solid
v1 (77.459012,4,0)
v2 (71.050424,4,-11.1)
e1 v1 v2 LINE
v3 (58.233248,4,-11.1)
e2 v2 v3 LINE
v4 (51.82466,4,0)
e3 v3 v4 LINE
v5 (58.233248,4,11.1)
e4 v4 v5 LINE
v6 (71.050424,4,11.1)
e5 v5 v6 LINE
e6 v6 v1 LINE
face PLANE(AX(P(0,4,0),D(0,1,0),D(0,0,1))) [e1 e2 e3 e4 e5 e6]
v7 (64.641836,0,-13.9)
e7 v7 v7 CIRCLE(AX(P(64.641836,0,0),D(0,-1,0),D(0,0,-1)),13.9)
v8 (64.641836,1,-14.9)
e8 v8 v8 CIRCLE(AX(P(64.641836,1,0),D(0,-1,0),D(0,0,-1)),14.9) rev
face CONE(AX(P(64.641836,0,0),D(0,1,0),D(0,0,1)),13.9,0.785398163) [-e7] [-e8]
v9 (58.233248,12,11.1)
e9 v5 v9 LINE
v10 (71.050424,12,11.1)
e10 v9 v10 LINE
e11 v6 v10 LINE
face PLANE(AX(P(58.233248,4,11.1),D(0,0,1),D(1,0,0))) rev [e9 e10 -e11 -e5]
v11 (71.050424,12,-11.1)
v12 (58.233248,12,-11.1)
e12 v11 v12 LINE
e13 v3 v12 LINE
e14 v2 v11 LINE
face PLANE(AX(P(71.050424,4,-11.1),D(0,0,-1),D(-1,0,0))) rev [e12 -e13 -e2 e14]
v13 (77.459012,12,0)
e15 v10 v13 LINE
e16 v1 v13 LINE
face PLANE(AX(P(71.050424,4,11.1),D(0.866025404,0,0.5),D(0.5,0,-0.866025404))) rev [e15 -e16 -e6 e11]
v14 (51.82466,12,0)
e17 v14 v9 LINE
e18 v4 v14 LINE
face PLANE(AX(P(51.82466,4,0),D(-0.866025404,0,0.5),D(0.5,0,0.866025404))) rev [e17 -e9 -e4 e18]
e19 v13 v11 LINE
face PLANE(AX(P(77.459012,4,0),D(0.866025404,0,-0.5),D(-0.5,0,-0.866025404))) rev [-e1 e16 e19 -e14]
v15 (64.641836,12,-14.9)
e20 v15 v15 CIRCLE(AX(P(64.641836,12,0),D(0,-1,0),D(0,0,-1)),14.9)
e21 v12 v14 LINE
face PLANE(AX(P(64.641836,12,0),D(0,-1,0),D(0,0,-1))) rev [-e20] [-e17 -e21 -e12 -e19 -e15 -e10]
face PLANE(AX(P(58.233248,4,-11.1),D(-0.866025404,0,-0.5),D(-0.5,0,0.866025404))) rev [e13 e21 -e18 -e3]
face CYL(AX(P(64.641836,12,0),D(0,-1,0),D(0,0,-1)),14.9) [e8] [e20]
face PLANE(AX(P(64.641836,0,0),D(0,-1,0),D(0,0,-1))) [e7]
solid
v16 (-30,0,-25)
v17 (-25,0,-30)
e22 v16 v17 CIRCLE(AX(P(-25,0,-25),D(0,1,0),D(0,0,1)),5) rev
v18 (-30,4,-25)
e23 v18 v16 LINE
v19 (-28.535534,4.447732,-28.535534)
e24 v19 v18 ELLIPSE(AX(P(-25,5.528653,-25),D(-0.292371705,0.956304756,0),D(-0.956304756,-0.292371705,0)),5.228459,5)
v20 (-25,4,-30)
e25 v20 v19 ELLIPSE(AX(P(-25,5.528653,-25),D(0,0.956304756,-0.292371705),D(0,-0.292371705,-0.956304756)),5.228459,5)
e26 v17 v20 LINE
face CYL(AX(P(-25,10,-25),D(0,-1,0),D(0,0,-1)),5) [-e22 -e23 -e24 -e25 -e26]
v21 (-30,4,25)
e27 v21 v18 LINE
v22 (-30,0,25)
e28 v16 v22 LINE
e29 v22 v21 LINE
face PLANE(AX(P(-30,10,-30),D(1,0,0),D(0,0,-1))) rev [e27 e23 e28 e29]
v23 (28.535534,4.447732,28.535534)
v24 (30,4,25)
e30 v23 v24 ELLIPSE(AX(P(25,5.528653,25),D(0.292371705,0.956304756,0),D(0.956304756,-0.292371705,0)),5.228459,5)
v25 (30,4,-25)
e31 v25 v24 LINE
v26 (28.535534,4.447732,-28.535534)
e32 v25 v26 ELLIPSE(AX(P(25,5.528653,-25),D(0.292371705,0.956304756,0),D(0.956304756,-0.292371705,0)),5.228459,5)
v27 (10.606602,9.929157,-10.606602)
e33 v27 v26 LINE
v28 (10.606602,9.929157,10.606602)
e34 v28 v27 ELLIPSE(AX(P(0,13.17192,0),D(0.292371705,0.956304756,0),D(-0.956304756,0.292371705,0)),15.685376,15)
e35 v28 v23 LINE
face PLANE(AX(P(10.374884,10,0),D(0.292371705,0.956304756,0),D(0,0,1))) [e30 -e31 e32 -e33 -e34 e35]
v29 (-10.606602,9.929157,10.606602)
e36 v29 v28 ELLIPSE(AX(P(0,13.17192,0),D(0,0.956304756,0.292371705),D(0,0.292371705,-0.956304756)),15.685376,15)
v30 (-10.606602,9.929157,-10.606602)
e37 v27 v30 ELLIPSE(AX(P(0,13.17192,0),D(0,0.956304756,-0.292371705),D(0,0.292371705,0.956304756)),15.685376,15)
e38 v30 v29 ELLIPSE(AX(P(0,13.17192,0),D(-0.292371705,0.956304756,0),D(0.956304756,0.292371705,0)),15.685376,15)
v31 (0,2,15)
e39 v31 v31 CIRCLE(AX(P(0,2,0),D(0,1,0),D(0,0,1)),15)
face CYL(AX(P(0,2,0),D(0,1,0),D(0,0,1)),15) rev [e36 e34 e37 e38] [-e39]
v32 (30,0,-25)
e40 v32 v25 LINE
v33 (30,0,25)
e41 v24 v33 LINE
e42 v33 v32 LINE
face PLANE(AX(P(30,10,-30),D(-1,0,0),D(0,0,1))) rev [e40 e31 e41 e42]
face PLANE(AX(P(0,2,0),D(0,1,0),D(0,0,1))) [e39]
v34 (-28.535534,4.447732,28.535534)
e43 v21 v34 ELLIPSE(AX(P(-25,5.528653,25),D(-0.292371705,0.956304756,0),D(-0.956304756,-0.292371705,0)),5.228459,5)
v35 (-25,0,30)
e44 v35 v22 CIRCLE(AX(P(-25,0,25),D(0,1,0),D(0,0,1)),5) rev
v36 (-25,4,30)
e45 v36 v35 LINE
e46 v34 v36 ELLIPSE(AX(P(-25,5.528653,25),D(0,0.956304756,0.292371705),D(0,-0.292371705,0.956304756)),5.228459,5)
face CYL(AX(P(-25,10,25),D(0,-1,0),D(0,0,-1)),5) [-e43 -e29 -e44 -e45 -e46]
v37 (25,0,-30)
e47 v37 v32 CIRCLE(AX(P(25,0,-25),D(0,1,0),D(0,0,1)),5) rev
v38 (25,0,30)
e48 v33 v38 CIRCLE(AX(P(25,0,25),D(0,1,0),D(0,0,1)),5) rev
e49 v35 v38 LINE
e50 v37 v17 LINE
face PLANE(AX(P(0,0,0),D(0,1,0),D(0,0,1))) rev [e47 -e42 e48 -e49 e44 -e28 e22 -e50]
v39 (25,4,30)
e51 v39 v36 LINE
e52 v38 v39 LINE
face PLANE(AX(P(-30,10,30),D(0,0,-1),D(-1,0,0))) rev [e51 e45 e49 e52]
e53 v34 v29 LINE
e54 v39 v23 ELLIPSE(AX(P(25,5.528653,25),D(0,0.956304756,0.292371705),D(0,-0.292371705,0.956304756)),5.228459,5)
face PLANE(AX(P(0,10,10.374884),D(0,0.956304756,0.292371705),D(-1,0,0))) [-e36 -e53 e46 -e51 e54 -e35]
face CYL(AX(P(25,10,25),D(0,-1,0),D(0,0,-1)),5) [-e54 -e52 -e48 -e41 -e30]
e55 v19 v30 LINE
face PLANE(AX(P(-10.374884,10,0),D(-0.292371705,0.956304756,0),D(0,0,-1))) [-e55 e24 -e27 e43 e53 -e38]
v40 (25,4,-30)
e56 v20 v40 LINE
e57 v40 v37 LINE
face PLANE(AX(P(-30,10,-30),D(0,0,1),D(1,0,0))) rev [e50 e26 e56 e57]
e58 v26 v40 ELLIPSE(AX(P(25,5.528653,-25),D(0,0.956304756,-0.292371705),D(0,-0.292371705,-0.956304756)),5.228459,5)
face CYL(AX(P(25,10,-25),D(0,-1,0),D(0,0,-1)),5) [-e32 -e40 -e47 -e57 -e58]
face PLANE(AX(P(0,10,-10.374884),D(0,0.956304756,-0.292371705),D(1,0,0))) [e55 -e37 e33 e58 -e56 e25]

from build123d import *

# Parameters (mm, degrees)
CROQUIS1_W              = 60
CROQUIS1_H              = 60
SALIENTE_EXTRUIR1_DEPTH = 10
CROQUIS2_R              = 15
CORTAR_EXTRUIR1_DEPTH   = 8
CROQUIS3_R              = 14.9
SALIENTE_EXTRUIR2_DEPTH = 12
CORTAR_EXTRUIR2_DEPTH   = 8
CHAFL_N1_SIZE           = 1
CHAFL_N2_SIZE           = 6
CHAFL_N2_SIZE_2         = 19.625115711
REDONDEO1_R             = 5


with BuildPart() as part:
    # Croquis1 → Saliente-Extruir1 (new body)
    with BuildSketch(Plane(origin=(0, 0, 0), x_dir=(1, 0, 0), z_dir=(0, 1, 0))):
        Rectangle(CROQUIS1_W, CROQUIS1_H)
    extrude(amount=SALIENTE_EXTRUIR1_DEPTH)

    # Croquis2 → Cortar-Extruir1 (cut)
    with BuildSketch(Plane(origin=(0, 10, 0), x_dir=(1, 0, 0), z_dir=(0, 1, 0))):
        with Locations(Location((0, 0, 0), (0, 0, 270))):
            Circle(CROQUIS2_R)
    extrude(amount=-CORTAR_EXTRUIR1_DEPTH, mode=Mode.SUBTRACT)

    # Chaflán2
    # the kernel refuses this chamfer: 19.625115711, 6 mm, written as the material it takes off along each edge
    with BuildSketch(Plane(origin=(-80.942779868, 10, -30), x_dir=(0, -0.9928170985366542, -0.11964200288050775), z_dir=(1, 0, 0)), Plane(origin=(-30, 10, 80.942779868), x_dir=(-0.11964200288050775, -0.9928170985366542, 0), z_dir=(0, 0, -1)), Plane(origin=(30, 10, -80.942779868), x_dir=(0.11964200288050775, -0.9928170985366542, 0), z_dir=(0, 0, 1))) as chafl_n2_piece_1:
        Polygon((CHAFL_N2_SIZE * 0.992817098537, -CHAFL_N2_SIZE * 0.119642002881), (-CHAFL_N2_SIZE_2 * 0.11964200288, -CHAFL_N2_SIZE_2 * 0.992817098532), (0, 0), align=None)
    extrude(amount=161.885559735, mode=Mode.SUBTRACT)
    with BuildSketch(Plane(origin=(80.942779868, 10, 30), x_dir=(0, 0.011263281176818222, -0.9999365672367082), z_dir=(-1, 0, 0))) as chafl_n2_piece_2:
        Polygon((CHAFL_N2_SIZE_2 * 0.999936567232, CHAFL_N2_SIZE_2 * 0.0112632811768), (-CHAFL_N2_SIZE * 0.0112632811768, CHAFL_N2_SIZE * 0.999936567237), (0, 0), align=None)
    extrude(amount=161.885559735, mode=Mode.SUBTRACT)

    # Redondeo1
    redondeo1_edges = [part.edges().sort_by_distance(p)[0] for p in [
        (-30, 2, -30),
        (30, 2, -30),
        (-30, 2, 30),
        (30, 2, 30),
    ]]
    fillet(redondeo1_edges, radius=REDONDEO1_R)


with BuildPart() as body_2:
    # Croquis3 → Saliente-Extruir2 (new body)
    with BuildSketch(Plane.XZ):
        with Locations(Location((64.64183589, 0, 0), (0, 0, 270))):
            Circle(CROQUIS3_R)
    extrude(amount=-SALIENTE_EXTRUIR2_DEPTH)

    # Croquis4 → Cortar-Extruir2 (cut)
    with BuildSketch(Plane(origin=(0, 12, 0), x_dir=(1, 0, 0), z_dir=(0, 1, 0))):
        Polygon((77.459011866, 0), (71.050423878, 11.1), (58.233247902, 11.1), (51.824659914, 0), (58.233247902, -11.1), (71.050423878, -11.1), align=None)
    extrude(amount=-CORTAR_EXTRUIR2_DEPTH, mode=Mode.SUBTRACT)

    # Chaflán1
    chafl_n1_edges = [body_2.edges().sort_by_distance(p)[0] for p in [
        (64.64183589, 0, 14.9),
    ]]
    chamfer(chafl_n1_edges, length=CHAFL_N1_SIZE)


solid = Compound([part.part, body_2.part])
